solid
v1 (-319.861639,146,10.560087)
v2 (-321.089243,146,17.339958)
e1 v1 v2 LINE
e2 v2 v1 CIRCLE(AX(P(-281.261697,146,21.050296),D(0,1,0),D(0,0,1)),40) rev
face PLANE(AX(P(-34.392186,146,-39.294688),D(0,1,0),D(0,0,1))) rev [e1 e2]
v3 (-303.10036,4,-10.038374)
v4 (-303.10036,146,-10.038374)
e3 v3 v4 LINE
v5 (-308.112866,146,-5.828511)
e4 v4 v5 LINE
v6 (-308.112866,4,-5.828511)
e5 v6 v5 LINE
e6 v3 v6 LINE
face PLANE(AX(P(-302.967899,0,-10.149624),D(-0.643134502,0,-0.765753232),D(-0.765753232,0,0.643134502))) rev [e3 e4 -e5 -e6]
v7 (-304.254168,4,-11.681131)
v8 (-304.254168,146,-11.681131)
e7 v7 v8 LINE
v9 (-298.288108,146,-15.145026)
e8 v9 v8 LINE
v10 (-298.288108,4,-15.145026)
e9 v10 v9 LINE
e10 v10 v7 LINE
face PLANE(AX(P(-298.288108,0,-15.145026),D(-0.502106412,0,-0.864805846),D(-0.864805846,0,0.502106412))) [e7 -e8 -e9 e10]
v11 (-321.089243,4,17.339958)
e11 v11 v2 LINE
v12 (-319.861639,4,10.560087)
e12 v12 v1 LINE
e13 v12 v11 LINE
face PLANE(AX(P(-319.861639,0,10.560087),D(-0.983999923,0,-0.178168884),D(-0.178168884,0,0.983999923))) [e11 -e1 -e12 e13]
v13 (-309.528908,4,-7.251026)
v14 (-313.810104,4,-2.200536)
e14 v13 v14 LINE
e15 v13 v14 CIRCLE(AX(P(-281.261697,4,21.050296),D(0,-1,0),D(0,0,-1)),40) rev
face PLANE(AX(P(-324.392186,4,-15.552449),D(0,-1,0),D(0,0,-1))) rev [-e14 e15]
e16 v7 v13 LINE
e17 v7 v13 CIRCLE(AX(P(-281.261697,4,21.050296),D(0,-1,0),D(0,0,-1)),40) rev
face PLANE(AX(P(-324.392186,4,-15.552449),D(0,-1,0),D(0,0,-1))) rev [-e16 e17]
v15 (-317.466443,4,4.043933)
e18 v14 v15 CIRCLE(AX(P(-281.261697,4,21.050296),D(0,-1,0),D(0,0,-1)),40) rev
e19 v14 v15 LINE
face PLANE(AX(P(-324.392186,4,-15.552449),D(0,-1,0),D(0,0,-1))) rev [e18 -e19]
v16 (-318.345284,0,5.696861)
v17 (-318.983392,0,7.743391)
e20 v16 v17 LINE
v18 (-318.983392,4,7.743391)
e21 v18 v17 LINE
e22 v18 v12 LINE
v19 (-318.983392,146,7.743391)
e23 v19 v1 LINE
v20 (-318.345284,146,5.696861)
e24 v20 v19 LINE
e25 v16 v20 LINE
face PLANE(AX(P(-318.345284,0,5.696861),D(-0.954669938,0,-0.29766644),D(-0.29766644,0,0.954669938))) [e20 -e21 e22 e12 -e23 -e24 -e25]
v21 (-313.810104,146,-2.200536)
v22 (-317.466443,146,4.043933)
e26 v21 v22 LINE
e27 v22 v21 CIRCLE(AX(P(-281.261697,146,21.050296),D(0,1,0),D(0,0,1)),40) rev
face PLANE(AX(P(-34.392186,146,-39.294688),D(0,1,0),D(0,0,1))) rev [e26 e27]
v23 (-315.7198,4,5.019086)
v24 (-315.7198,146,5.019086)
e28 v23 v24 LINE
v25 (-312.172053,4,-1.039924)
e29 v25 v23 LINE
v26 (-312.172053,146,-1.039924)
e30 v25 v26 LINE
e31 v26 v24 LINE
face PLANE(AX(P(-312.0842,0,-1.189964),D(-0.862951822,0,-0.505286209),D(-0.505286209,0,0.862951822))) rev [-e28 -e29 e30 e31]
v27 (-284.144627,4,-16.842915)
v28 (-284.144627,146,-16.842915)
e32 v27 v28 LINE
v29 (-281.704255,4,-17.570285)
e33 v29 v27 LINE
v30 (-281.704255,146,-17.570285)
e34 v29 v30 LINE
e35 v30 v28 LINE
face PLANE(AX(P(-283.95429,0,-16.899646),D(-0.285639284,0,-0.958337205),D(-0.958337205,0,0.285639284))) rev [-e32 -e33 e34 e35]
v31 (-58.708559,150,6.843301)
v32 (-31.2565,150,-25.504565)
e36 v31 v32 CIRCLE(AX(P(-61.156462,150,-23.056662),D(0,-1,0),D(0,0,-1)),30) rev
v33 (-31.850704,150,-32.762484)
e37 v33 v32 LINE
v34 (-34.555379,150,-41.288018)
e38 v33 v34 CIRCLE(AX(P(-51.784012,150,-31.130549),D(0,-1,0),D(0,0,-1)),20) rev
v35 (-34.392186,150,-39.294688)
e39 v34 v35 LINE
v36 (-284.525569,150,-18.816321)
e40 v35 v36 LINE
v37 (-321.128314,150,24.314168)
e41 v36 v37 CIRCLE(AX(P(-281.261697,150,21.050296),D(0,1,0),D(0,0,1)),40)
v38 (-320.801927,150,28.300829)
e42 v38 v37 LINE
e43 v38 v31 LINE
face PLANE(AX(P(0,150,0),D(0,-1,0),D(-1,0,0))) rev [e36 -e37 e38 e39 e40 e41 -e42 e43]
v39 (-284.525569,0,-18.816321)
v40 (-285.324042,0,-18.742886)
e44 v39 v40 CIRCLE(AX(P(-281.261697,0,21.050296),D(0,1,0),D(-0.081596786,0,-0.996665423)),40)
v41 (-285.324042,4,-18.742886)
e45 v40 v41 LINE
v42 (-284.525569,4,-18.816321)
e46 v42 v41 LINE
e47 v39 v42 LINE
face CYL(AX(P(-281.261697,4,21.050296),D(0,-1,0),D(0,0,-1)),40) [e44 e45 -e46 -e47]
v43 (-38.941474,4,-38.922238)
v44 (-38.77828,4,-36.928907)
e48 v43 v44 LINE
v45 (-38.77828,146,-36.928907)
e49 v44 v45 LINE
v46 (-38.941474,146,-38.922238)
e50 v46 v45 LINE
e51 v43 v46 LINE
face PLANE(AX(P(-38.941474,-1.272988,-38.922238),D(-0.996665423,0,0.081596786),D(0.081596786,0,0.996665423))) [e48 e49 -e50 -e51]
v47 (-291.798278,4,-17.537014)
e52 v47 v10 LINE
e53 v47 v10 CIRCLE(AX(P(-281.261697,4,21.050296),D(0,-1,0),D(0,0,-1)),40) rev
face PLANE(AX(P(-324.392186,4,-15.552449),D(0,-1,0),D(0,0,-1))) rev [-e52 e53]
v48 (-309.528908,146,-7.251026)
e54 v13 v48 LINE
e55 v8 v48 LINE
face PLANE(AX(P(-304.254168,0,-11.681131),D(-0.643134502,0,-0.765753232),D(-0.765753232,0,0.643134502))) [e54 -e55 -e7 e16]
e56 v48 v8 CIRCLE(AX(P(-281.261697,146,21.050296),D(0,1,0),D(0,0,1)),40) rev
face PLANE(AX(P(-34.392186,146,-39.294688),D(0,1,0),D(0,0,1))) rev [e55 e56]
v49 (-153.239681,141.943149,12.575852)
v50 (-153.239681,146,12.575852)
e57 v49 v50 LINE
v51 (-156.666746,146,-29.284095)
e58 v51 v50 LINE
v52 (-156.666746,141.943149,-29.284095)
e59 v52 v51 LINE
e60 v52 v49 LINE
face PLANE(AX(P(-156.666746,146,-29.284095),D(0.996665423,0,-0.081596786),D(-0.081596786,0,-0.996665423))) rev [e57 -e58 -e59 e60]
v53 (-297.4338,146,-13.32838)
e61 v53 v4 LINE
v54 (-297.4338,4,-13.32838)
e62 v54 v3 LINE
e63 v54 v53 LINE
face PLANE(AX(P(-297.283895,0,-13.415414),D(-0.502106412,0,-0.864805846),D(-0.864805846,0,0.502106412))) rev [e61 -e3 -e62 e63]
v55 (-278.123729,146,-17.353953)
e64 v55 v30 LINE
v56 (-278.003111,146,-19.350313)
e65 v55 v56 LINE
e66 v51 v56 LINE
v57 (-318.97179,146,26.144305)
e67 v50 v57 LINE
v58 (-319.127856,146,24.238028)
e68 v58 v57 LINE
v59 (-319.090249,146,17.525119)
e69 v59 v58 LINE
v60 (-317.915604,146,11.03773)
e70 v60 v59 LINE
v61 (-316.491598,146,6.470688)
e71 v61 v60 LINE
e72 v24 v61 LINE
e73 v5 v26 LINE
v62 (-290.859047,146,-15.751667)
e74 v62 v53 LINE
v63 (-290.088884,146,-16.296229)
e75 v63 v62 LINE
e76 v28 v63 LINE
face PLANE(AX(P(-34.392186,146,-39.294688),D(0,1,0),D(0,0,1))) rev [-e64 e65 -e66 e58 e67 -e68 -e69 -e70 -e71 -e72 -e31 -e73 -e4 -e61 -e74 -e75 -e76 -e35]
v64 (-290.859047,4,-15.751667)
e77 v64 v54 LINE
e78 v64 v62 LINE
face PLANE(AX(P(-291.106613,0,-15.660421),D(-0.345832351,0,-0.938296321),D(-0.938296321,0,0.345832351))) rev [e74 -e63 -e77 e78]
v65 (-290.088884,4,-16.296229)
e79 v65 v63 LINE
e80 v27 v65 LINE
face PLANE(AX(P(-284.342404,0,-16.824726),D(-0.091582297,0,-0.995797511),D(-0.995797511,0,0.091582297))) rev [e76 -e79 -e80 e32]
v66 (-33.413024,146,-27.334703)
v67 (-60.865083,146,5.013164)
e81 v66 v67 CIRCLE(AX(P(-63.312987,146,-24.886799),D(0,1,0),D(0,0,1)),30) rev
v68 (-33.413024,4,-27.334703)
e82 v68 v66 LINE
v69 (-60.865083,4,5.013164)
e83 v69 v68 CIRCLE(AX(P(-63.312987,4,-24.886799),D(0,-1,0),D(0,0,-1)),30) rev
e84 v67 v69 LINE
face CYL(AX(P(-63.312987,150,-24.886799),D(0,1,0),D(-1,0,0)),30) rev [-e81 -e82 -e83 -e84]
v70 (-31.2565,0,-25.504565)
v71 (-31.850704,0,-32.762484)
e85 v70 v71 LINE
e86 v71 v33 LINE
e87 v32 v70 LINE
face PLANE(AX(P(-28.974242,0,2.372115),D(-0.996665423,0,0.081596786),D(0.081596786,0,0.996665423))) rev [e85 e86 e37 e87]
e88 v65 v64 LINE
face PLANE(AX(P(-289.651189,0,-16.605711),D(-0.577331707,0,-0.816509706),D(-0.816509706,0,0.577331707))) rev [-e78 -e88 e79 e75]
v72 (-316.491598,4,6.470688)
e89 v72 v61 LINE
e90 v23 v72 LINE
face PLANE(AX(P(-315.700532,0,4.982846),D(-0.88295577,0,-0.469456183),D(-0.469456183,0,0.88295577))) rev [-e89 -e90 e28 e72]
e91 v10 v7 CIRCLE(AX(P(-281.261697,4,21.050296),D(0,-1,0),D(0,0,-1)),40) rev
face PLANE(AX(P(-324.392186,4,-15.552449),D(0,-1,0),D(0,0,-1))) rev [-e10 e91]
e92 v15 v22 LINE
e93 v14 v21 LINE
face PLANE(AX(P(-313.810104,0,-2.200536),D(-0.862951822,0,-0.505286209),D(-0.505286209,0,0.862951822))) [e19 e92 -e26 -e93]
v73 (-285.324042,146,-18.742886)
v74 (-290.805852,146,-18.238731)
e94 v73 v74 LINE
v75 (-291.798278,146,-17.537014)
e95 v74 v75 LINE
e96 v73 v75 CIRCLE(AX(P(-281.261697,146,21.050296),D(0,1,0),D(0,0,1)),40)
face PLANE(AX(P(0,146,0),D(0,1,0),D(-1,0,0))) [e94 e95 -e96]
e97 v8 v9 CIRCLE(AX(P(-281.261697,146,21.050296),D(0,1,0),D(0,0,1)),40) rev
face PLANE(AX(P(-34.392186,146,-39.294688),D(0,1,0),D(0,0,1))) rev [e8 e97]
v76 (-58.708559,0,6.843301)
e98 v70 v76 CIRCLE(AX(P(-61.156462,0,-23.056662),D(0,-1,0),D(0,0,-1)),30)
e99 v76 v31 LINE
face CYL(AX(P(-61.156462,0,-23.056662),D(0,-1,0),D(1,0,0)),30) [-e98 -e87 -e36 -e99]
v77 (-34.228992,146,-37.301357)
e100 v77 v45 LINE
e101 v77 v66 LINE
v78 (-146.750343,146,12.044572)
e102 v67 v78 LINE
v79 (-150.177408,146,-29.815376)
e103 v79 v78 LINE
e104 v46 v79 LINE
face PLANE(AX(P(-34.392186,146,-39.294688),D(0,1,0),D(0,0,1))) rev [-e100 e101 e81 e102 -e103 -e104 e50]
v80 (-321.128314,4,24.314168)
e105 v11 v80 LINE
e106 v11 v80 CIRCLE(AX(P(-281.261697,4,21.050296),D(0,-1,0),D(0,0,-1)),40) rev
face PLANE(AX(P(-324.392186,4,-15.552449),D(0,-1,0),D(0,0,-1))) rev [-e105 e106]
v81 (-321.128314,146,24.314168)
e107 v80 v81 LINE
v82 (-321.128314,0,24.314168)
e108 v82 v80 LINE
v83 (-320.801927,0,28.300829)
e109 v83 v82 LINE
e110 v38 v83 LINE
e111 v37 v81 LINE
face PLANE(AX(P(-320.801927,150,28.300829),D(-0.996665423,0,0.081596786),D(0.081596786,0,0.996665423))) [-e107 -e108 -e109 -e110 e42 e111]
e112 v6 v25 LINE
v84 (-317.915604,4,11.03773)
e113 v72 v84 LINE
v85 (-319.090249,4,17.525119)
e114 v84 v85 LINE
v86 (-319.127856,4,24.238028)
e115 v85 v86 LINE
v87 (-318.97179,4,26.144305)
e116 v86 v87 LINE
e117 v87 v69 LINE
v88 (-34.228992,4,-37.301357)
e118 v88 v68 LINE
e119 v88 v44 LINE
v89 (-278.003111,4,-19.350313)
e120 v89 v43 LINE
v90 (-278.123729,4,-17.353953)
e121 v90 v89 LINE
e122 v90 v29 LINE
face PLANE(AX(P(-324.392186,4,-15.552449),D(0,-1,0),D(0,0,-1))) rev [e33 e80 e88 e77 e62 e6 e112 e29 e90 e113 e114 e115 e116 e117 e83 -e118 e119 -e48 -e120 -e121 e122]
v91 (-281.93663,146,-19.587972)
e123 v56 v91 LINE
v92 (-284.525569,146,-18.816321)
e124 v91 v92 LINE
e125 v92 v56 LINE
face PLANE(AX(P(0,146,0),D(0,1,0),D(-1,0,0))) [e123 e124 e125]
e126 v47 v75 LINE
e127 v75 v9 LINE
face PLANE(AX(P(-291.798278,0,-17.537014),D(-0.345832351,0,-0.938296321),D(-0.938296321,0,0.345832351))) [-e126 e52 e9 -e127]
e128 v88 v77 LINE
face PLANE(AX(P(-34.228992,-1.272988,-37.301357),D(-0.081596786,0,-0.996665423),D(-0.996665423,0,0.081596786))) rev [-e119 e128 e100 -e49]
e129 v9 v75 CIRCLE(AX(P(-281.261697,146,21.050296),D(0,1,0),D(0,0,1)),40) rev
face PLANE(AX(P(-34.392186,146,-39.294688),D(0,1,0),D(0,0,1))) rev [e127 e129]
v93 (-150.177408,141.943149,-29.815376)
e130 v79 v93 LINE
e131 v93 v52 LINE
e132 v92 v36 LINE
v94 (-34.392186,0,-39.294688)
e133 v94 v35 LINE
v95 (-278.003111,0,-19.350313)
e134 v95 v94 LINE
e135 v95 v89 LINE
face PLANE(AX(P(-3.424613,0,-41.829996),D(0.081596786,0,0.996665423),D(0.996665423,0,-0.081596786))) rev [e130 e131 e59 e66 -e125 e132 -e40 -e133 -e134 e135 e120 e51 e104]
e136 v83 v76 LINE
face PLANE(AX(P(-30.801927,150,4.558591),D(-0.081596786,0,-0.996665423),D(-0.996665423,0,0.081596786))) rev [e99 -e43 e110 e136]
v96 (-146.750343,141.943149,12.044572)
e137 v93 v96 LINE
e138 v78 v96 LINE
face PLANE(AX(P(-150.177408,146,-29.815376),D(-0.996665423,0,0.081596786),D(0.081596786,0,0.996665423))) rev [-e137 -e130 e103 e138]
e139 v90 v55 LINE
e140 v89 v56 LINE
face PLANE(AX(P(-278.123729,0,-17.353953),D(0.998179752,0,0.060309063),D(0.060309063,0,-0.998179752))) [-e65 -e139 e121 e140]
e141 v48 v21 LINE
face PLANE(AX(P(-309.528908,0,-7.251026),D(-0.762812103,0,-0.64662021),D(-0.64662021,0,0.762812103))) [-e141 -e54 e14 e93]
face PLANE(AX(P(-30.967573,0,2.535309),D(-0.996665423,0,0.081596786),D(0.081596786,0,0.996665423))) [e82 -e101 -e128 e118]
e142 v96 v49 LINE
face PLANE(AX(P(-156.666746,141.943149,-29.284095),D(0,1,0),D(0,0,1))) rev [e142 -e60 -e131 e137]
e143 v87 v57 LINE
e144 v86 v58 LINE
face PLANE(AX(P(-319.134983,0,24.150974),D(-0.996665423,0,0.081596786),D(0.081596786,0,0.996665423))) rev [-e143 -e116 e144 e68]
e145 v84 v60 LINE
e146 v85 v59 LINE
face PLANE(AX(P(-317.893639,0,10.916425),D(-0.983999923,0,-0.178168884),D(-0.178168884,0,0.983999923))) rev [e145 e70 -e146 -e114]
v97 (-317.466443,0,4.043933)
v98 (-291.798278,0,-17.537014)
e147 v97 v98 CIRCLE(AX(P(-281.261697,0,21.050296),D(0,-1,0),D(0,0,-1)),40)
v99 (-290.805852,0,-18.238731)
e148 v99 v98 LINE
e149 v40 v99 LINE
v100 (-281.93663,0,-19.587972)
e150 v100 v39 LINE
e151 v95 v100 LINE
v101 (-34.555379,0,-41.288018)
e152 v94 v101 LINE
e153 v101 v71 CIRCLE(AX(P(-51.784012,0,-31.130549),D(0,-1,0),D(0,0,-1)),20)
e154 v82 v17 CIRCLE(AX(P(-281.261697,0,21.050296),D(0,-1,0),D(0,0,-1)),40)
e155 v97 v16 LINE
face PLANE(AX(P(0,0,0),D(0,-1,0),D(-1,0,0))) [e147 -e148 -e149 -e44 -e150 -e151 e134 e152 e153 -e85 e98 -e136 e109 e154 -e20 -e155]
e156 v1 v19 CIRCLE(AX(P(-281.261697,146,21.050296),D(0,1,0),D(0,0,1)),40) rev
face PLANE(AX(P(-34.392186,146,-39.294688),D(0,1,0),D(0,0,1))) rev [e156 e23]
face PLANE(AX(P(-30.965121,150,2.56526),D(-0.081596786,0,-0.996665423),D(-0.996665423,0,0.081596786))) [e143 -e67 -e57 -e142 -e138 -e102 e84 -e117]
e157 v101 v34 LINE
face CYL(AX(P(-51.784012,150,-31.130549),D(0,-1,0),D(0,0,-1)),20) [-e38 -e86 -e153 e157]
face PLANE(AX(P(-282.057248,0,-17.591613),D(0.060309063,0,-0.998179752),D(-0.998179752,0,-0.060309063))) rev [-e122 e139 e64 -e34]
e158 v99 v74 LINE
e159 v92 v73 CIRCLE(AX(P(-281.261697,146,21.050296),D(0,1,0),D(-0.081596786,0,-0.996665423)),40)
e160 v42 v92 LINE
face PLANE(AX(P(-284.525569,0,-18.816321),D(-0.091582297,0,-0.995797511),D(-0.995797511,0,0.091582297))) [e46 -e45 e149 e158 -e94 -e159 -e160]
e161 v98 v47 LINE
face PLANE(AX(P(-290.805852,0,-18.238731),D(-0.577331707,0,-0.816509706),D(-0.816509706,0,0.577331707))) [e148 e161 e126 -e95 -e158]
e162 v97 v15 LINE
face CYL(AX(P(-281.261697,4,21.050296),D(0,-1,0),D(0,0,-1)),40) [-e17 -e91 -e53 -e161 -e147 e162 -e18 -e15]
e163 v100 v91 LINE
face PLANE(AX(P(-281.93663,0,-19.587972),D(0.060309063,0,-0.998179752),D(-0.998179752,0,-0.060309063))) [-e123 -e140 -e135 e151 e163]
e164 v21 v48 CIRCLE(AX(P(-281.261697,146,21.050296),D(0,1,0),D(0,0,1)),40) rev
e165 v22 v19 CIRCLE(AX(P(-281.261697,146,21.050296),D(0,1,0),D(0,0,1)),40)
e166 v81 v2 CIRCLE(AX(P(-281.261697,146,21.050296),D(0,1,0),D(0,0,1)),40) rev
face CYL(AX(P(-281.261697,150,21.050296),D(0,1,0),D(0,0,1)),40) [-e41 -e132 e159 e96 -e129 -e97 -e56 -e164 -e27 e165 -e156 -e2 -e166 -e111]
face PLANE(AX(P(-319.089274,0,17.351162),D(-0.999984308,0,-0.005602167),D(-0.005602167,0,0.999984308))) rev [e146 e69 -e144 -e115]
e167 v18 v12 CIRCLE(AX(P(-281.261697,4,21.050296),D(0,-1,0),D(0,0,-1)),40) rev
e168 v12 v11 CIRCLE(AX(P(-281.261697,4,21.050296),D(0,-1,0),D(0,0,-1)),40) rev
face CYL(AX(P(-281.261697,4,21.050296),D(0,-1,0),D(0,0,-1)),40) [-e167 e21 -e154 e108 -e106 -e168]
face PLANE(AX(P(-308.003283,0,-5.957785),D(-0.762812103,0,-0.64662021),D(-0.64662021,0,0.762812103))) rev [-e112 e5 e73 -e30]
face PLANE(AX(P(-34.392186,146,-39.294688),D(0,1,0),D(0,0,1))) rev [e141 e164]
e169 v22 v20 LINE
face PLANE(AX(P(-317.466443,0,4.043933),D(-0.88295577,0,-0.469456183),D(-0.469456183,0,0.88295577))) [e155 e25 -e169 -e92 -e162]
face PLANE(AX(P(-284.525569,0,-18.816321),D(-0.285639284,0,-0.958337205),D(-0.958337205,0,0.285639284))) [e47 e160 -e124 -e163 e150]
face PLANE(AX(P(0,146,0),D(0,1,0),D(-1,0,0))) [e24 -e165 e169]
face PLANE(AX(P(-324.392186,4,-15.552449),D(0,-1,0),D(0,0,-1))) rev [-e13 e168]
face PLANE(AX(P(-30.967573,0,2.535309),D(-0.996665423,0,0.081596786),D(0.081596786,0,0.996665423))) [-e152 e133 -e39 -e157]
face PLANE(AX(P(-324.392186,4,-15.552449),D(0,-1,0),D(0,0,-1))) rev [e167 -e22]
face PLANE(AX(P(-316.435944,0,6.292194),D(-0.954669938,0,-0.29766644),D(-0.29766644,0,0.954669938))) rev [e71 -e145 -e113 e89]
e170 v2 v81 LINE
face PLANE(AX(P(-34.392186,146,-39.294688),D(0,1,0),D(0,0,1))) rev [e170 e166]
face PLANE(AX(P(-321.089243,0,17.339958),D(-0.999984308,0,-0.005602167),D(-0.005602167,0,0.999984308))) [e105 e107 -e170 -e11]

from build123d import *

# Parameters (mm, degrees)
EXTRUDE_THIN1_DEPTH   = 150
SKETCH5_W             = 290.970262873
SKETCH5_H             = 4
EXTRUDE_THIN2_DEPTH   = 42
EXTRUDE_THIN2_2_DEPTH = 42
FILLET6_R             = 40
EXTRUDE_THIN7_DEPTH   = 146
FILLET14_R            = 40
SKETCH25_W            = 46
SKETCH25_H            = 150
BOSS_EXTRUDE1_DEPTH   = 2
FILLET22_R            = 30
FILLET28_R            = 30
FILLET32_R            = 20
SKETCH29_W            = 6.511049677
SKETCH29_H            = 4.056851241
BOSS_EXTRUDE2_DEPTH   = 42
EXTRUDE_THIN8_DEPTH   = 142


with BuildPart() as part:
    # Sketch2 → Extrude-Thin1 (new body)
    with BuildSketch(Plane(origin=(0, 0, 0), x_dir=(1, 0, 0), z_dir=(0, 1, 0))):
        Polygon((-30.965120595, -2.565260163), (-320.965120595, -26.307498403), (-320.801927023, -28.300829248), (-30.801927023, -4.558591008), align=None)
    extrude(amount=EXTRUDE_THIN1_DEPTH)



with BuildPart() as body_2:
    # Sketch5 → Extrude-Thin2 (new body)
    with BuildSketch(Plane(origin=(0.002452129, 0, 0.029951579), x_dir=(-0.9966654225627806, 0, 0.08159678589107741), z_dir=(-0.08159678589107741, 0, -0.9966654225627806))):
        with Locations((176.556313424, 2)):
            Rectangle(SKETCH5_W, SKETCH5_H)
    extrude(amount=EXTRUDE_THIN2_DEPTH)

    # Fillet14
    fillet14_edges = [body_2.edges().sort_by_distance(p)[0] for p in [
        (-324.392185602, 2, -15.552449344),
    ]]
    fillet(fillet14_edges, radius=FILLET14_R)


with BuildPart() as body_3:
    # Sketch5 → Extrude-Thin2 2 (new body)
    with BuildSketch(Plane(origin=(0.002452129, 0, 0.029951579), x_dir=(-0.9966654225627806, 0, 0.08159678589107741), z_dir=(-0.08159678589107741, 0, -0.9966654225627806))):
        with Locations((176.556313424, 148)):
            Rectangle(SKETCH5_W, SKETCH5_H)
    extrude(amount=EXTRUDE_THIN2_2_DEPTH)

    # Fillet6
    fillet6_edges = [body_3.edges().sort_by_distance(p)[0] for p in [
        (-324.392185602, 148, -15.552449344),
    ]]
    fillet(fillet6_edges, radius=FILLET6_R)


with BuildPart() as part_1:
    add(part.part)

    add(body_3.part)  # Extrude-Thin7 merges body 3
    # Sketch11 → Extrude-Thin7 (add)
    with BuildSketch(Plane.XZ.offset(-146)):
        Polygon((-278.003111059, -19.350312998), (-281.936630301, -19.587972456), (-284.5255687, -18.81632078), (-290.805852057, -18.238730686), (-291.798277728, -17.537013607), (-298.288108084, -15.145025876), (-304.254167802, -11.68113065), (-309.528907685, -7.251025667), (-313.810104121, -2.200536359), (-317.466443209, 4.043933459), (-318.345283528, 5.696861164), (-319.86163909, 10.560086826), (-321.089242867, 17.33995769), (-321.128314167, 24.314167558), (-320.965120595, 26.307498403), (-318.97178975, 26.144304832), (-319.127856228, 24.238027995), (-319.090248803, 17.52511906), (-317.915603526, 11.037730019), (-316.491598121, 6.470687959), (-315.719800302, 5.019086377), (-312.17205348, -1.039924404), (-308.112866331, -5.828511332), (-303.100359764, -10.038373964), (-297.433799934, -13.328379507), (-290.85904721, -15.751667479), (-290.088883869, -16.296228937), (-284.144627091, -16.842915072), (-281.704255181, -17.570285439), (-278.123729185, -17.353953494), align=None)
    extrude(amount=EXTRUDE_THIN7_DEPTH)


    add(body_2.part)  # Boss-Extrude1 merges body 2
    # Sketch25 → Boss-Extrude1 (add)
    with BuildSketch(Plane(origin=(-30.967572724, 0, 2.535308584), x_dir=(-0.08159678589107766, 0, -0.9966654225627805), z_dir=(0.9966654225627803, 0, -0.08159678589107765))):
        with Locations((20.969948211, 75)):
            Rectangle(SKETCH25_W, SKETCH25_H)
    extrude(amount=BOSS_EXTRUDE1_DEPTH)

    # Fillet22
    fillet22_edges = [part_1.edges().sort_by_distance(p)[0] for p in [
        (-30.965120595, 75, 2.565260163),
    ]]
    fillet(fillet22_edges, radius=FILLET22_R)

    # Fillet28
    fillet28_edges = [part_1.edges().sort_by_distance(p)[0] for p in [
        (-28.808596178, 75, 4.395397436),
    ]]
    fillet(fillet28_edges, radius=FILLET28_R)

    # Fillet32
    # the kernel refuses this fillet: 20 mm, written as the material it takes off along each edge
    with BuildSketch(Plane(origin=(-32.562048329, -21.794494718, -41.451212002), x_dir=(0.08159678589107701, 0, 0.9966654225627805), z_dir=(0, 1, 0))) as fillet32_piece_1:
        with BuildLine():
            CenterArc((8.717797887, -20), FILLET32_R, 90, 25.841932763)
            Line((0, -2), (0, 0))
            Line((0, 0), (8.717797887, 0))
        make_face()
    extrude(amount=193.588989435, mode=Mode.SUBTRACT)

    # Sketch29 → Boss-Extrude2 (add)
    with BuildSketch(Plane(origin=(0.002452129, 0, 0.029951579), x_dir=(-0.9966654225627805, 0, 0.0815967858910774), z_dir=(-0.0815967858910774, 0, -0.9966654225627805))):
        with Locations((150.499315868, 143.971574379)):
            Rectangle(SKETCH29_W, SKETCH29_H)
    extrude(amount=BOSS_EXTRUDE2_DEPTH)

    # Sketch35 → Extrude-Thin8 (add)
    with BuildSketch(Plane.XZ.offset(-146)):
        Polygon((-34.392185602, -39.294687585), (-38.941474001, -38.922238312), (-38.77828043, -36.928907467), (-34.228992031, -37.30135674), align=None)
    extrude(amount=EXTRUDE_THIN8_DEPTH)


solid = part_1.part
